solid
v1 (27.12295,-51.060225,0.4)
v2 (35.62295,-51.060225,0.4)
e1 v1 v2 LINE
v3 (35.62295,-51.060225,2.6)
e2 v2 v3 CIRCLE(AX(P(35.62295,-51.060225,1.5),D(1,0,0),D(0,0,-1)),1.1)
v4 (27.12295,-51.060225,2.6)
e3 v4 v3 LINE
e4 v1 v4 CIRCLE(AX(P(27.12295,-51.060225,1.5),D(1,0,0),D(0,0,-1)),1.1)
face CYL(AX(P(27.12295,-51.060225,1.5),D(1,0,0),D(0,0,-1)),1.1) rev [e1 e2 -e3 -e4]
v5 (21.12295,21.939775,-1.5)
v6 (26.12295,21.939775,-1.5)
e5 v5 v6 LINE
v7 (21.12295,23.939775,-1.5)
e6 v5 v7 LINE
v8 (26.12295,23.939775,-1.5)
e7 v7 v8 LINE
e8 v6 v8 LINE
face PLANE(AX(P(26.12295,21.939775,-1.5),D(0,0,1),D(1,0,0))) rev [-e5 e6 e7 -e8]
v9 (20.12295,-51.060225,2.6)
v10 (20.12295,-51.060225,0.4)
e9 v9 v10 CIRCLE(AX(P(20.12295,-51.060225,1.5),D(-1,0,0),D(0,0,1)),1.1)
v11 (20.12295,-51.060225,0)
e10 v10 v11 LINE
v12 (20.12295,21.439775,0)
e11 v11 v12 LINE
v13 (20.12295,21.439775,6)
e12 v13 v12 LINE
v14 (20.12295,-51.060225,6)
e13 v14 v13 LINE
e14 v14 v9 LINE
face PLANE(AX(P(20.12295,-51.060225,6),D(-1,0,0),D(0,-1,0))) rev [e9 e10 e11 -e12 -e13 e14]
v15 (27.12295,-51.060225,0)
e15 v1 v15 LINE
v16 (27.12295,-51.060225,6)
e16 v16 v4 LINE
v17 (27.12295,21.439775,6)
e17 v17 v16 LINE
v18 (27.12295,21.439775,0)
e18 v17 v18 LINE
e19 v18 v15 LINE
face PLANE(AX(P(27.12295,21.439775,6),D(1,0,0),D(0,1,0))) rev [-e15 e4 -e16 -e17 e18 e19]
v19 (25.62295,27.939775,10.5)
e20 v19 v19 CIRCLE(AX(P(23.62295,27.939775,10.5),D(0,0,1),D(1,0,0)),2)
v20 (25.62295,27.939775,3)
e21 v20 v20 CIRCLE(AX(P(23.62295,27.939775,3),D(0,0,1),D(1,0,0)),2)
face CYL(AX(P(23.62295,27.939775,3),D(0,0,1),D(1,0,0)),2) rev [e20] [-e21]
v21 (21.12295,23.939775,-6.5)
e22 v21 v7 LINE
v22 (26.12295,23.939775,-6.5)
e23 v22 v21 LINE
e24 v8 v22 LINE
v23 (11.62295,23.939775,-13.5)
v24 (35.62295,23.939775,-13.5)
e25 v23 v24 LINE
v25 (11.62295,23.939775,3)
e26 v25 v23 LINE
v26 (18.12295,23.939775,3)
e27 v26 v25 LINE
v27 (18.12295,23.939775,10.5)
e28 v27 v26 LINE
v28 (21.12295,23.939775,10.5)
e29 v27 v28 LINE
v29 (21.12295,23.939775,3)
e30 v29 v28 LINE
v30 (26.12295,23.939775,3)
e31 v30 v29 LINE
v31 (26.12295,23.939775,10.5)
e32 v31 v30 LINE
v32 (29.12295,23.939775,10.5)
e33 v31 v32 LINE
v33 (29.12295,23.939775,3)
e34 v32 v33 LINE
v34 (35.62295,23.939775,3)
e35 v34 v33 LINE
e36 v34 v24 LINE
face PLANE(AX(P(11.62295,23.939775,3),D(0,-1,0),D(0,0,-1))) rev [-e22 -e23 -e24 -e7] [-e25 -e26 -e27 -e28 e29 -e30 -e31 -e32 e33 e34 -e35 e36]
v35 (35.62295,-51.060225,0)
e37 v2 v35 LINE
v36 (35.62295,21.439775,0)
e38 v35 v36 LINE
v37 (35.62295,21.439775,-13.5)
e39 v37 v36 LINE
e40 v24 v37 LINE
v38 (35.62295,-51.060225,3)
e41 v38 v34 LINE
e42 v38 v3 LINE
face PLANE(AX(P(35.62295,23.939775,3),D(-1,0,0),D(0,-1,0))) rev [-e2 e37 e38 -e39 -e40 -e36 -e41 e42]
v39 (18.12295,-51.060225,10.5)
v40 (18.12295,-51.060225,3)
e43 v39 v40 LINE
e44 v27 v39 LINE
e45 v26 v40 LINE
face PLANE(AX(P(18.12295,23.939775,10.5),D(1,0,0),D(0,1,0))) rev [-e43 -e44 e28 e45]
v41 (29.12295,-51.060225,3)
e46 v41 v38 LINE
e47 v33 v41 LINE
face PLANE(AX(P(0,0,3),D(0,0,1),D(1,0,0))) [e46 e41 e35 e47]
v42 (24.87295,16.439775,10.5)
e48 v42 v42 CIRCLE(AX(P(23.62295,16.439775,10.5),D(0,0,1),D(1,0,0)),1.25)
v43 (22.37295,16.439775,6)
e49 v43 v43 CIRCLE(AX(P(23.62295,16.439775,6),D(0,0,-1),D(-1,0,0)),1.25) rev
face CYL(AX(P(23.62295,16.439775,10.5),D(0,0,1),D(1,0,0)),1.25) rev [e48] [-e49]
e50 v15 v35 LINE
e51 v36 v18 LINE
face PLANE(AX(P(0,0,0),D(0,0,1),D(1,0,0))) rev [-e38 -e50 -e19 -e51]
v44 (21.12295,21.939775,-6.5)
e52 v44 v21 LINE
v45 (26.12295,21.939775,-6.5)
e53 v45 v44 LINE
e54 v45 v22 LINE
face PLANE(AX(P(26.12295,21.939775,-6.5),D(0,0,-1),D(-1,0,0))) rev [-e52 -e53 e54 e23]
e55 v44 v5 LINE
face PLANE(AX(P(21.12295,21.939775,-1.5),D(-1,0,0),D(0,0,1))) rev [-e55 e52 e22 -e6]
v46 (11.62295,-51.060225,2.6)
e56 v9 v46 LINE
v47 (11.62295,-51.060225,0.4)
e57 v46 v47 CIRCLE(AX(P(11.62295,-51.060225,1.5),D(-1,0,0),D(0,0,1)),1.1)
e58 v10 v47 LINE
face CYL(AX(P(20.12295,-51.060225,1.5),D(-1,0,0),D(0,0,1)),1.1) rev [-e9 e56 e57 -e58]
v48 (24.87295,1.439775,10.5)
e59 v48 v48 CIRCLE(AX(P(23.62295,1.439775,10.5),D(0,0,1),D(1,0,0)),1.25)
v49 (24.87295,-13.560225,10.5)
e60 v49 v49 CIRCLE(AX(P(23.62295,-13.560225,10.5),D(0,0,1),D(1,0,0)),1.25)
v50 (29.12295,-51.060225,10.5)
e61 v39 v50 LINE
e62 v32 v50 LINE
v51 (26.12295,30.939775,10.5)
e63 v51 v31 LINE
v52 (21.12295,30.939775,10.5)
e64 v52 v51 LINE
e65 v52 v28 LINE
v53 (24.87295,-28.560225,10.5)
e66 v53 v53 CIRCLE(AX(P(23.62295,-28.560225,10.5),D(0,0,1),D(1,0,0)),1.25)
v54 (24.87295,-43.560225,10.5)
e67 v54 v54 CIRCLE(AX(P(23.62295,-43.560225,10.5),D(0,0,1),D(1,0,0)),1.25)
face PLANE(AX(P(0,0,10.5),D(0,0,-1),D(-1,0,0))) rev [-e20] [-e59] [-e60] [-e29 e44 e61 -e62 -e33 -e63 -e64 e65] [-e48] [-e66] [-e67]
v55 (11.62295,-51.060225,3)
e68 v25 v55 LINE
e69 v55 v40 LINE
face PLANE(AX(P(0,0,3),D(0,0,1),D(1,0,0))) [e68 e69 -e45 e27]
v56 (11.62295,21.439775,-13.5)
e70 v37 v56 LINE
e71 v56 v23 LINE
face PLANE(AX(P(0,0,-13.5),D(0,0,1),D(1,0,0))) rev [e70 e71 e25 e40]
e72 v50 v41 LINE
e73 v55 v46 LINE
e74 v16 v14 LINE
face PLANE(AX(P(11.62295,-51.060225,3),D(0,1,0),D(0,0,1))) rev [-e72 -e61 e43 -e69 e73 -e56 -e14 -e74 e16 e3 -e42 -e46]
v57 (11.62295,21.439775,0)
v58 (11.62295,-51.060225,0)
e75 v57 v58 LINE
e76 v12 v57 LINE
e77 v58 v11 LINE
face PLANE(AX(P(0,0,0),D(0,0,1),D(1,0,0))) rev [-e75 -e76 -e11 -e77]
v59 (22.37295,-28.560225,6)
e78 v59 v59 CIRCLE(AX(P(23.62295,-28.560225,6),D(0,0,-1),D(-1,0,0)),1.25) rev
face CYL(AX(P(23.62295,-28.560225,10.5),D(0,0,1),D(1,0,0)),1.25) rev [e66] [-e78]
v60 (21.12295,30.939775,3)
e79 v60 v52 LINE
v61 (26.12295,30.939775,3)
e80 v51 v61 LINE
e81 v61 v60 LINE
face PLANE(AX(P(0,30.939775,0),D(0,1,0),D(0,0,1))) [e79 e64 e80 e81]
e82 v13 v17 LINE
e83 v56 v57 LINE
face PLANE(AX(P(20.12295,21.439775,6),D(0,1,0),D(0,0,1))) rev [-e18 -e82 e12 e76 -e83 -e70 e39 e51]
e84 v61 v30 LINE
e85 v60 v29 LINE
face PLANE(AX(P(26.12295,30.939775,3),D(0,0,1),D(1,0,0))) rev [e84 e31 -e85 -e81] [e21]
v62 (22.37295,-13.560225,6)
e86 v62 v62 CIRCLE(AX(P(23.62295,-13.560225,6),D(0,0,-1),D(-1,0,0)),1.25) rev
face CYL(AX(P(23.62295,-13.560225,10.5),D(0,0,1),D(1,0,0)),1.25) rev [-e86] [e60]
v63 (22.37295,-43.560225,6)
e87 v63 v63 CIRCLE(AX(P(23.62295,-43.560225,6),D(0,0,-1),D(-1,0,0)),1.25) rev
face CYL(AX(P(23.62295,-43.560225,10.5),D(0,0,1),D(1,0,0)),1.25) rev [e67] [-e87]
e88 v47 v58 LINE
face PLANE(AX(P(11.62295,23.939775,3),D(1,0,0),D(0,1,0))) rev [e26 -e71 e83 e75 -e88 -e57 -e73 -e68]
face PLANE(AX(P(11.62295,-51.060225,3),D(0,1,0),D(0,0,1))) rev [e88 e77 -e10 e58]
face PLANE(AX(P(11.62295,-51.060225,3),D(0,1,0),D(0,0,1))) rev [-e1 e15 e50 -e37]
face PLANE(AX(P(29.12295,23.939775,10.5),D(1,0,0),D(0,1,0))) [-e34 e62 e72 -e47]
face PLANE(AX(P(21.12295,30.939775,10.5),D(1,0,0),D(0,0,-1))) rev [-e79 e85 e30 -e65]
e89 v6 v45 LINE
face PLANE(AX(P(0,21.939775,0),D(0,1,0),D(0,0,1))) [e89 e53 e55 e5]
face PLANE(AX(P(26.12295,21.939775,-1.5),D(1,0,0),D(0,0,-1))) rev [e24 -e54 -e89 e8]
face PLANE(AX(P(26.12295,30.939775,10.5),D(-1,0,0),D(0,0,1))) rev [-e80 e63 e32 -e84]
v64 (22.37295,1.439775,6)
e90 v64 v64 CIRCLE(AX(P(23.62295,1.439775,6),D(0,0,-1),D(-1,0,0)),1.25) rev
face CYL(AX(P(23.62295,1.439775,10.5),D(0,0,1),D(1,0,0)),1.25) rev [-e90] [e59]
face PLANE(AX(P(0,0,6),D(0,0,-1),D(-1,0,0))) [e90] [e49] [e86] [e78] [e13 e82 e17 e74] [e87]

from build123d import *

# Parameters (mm, degrees)
SKETCH1_W                   = 24
SKETCH1_H                   = 75
BOSS_EXTRUDE1_DEPTH         = 3
SKETCH2_W                   = 11
SKETCH2_H                   = 75
BOSS_EXTRUDE2_DEPTH         = 7.5
TAP_DRILL_FOR_M3X0_5_TAP1_D = 2.5
SKETCH5_W                   = 7
SKETCH5_H                   = 72.5
CUT_EXTRUDE1_DEPTH          = 6
CUT_LOFT1_START             = 11.622950039
CUT_LOFT1_DEPTH             = 8.5
CUT_LOFT5_START             = 27.122950039
CUT_LOFT5_DEPTH             = 8.5
SKETCH16_W                  = 24
SKETCH16_H                  = 2.5
BOSS_EXTRUDE4_DEPTH         = 13.5
SKETCH17_W                  = 5
SKETCH17_H                  = 7.5
BOSS_EXTRUDE5_DEPTH         = 7
SKETCH18_R                  = 2
CUT_EXTRUDE2_DEPTH          = 7.5
SKETCH20_W                  = 5
SKETCH20_H                  = 5
CUT_EXTRUDE3_DEPTH          = 2


# Read off the part's stored shape, not the designer's step: Cut-Loft1, Cut-Loft5
with BuildPart() as part:
    # Sketch1 → Boss-Extrude1 (new body)
    with BuildSketch(Plane.XY):
        with Locations((23.622950039, -13.56022481)):
            Rectangle(SKETCH1_W, SKETCH1_H)
    extrude(amount=BOSS_EXTRUDE1_DEPTH)

    # Sketch2 → Boss-Extrude2 (add)
    with BuildSketch(Plane.XY.offset(3)):
        with Locations((23.622950039, -13.56022481)):
            Rectangle(SKETCH2_W, SKETCH2_H)
    extrude(amount=BOSS_EXTRUDE2_DEPTH)

    # Tap Drill for M3x0.5 Tap1 (through all)
    with Locations(Plane(origin=(23.622950039, 16.43977519, 10.5), x_dir=(1, 0, 0), z_dir=(0, 0, 1))):
        with Locations((0, 0), (0, -15), (0, -30), (0, -45), (0, -60)):
            Hole(TAP_DRILL_FOR_M3X0_5_TAP1_D / 2)

    # Sketch5 → Cut-Extrude1 (cut)
    with BuildSketch(Plane(origin=(0, 0, 0), x_dir=(-1, 0, 0), z_dir=(0, 0, -1))):
        with Locations((-23.622950039, -14.81022481)):
            Rectangle(SKETCH5_W, SKETCH5_H)
    extrude(amount=-CUT_EXTRUDE1_DEPTH, mode=Mode.SUBTRACT)

    # Cut-Loft1 outline → Cut-Loft1 (cut)
    with BuildSketch(Plane.YZ.offset(CUT_LOFT1_START)):
        with BuildLine():
            ThreePointArc((-51.06022481, 0.4), (-49.96022481, 1.5), (-51.06022481, 2.6))
            Line((-51.06022481, 2.6), (-51.06022481, 0.4))
        make_face()
    extrude(amount=CUT_LOFT1_DEPTH, mode=Mode.SUBTRACT)

    # Cut-Loft5 outline → Cut-Loft5 (cut)
    with BuildSketch(Plane.YZ.offset(CUT_LOFT5_START)):
        with BuildLine():
            Line((-51.06022481, 2.6), (-51.06022481, 0.4))
            ThreePointArc((-51.06022481, 0.4), (-49.96022481, 1.5), (-51.06022481, 2.6))
        make_face()
    extrude(amount=CUT_LOFT5_DEPTH, mode=Mode.SUBTRACT)

    # Sketch16 → Boss-Extrude4 (add)
    with BuildSketch(Plane(origin=(0, 0, 0), x_dir=(-1, 0, 0), z_dir=(0, 0, -1))):
        with Locations((-23.622950039, 22.68977519)):
            Rectangle(SKETCH16_W, SKETCH16_H)
    extrude(amount=BOSS_EXTRUDE4_DEPTH)

    # Sketch17 → Boss-Extrude5 (add)
    with BuildSketch(Plane(origin=(0, 23.93977519, 0), x_dir=(1, 0, 0), z_dir=(0, 1, 0))):
        with Locations((23.622950039, -6.75)):
            Rectangle(SKETCH17_W, SKETCH17_H)
    extrude(amount=BOSS_EXTRUDE5_DEPTH)

    # Sketch18 → Cut-Extrude2 (cut)
    with BuildSketch(Plane.XY.offset(10.5)):
        with Locations((23.622950039, 27.93977519)):
            Circle(SKETCH18_R)
    extrude(amount=-CUT_EXTRUDE2_DEPTH, mode=Mode.SUBTRACT)

    # Sketch20 → Cut-Extrude3 (cut)
    with BuildSketch(Plane(origin=(0, 23.93977519, 0), x_dir=(1, 0, 0), z_dir=(0, 1, 0))):
        with Locations((23.622950039, 4)):
            Rectangle(SKETCH20_W, SKETCH20_H)
    extrude(amount=-CUT_EXTRUDE3_DEPTH, mode=Mode.SUBTRACT)


solid = part.part
